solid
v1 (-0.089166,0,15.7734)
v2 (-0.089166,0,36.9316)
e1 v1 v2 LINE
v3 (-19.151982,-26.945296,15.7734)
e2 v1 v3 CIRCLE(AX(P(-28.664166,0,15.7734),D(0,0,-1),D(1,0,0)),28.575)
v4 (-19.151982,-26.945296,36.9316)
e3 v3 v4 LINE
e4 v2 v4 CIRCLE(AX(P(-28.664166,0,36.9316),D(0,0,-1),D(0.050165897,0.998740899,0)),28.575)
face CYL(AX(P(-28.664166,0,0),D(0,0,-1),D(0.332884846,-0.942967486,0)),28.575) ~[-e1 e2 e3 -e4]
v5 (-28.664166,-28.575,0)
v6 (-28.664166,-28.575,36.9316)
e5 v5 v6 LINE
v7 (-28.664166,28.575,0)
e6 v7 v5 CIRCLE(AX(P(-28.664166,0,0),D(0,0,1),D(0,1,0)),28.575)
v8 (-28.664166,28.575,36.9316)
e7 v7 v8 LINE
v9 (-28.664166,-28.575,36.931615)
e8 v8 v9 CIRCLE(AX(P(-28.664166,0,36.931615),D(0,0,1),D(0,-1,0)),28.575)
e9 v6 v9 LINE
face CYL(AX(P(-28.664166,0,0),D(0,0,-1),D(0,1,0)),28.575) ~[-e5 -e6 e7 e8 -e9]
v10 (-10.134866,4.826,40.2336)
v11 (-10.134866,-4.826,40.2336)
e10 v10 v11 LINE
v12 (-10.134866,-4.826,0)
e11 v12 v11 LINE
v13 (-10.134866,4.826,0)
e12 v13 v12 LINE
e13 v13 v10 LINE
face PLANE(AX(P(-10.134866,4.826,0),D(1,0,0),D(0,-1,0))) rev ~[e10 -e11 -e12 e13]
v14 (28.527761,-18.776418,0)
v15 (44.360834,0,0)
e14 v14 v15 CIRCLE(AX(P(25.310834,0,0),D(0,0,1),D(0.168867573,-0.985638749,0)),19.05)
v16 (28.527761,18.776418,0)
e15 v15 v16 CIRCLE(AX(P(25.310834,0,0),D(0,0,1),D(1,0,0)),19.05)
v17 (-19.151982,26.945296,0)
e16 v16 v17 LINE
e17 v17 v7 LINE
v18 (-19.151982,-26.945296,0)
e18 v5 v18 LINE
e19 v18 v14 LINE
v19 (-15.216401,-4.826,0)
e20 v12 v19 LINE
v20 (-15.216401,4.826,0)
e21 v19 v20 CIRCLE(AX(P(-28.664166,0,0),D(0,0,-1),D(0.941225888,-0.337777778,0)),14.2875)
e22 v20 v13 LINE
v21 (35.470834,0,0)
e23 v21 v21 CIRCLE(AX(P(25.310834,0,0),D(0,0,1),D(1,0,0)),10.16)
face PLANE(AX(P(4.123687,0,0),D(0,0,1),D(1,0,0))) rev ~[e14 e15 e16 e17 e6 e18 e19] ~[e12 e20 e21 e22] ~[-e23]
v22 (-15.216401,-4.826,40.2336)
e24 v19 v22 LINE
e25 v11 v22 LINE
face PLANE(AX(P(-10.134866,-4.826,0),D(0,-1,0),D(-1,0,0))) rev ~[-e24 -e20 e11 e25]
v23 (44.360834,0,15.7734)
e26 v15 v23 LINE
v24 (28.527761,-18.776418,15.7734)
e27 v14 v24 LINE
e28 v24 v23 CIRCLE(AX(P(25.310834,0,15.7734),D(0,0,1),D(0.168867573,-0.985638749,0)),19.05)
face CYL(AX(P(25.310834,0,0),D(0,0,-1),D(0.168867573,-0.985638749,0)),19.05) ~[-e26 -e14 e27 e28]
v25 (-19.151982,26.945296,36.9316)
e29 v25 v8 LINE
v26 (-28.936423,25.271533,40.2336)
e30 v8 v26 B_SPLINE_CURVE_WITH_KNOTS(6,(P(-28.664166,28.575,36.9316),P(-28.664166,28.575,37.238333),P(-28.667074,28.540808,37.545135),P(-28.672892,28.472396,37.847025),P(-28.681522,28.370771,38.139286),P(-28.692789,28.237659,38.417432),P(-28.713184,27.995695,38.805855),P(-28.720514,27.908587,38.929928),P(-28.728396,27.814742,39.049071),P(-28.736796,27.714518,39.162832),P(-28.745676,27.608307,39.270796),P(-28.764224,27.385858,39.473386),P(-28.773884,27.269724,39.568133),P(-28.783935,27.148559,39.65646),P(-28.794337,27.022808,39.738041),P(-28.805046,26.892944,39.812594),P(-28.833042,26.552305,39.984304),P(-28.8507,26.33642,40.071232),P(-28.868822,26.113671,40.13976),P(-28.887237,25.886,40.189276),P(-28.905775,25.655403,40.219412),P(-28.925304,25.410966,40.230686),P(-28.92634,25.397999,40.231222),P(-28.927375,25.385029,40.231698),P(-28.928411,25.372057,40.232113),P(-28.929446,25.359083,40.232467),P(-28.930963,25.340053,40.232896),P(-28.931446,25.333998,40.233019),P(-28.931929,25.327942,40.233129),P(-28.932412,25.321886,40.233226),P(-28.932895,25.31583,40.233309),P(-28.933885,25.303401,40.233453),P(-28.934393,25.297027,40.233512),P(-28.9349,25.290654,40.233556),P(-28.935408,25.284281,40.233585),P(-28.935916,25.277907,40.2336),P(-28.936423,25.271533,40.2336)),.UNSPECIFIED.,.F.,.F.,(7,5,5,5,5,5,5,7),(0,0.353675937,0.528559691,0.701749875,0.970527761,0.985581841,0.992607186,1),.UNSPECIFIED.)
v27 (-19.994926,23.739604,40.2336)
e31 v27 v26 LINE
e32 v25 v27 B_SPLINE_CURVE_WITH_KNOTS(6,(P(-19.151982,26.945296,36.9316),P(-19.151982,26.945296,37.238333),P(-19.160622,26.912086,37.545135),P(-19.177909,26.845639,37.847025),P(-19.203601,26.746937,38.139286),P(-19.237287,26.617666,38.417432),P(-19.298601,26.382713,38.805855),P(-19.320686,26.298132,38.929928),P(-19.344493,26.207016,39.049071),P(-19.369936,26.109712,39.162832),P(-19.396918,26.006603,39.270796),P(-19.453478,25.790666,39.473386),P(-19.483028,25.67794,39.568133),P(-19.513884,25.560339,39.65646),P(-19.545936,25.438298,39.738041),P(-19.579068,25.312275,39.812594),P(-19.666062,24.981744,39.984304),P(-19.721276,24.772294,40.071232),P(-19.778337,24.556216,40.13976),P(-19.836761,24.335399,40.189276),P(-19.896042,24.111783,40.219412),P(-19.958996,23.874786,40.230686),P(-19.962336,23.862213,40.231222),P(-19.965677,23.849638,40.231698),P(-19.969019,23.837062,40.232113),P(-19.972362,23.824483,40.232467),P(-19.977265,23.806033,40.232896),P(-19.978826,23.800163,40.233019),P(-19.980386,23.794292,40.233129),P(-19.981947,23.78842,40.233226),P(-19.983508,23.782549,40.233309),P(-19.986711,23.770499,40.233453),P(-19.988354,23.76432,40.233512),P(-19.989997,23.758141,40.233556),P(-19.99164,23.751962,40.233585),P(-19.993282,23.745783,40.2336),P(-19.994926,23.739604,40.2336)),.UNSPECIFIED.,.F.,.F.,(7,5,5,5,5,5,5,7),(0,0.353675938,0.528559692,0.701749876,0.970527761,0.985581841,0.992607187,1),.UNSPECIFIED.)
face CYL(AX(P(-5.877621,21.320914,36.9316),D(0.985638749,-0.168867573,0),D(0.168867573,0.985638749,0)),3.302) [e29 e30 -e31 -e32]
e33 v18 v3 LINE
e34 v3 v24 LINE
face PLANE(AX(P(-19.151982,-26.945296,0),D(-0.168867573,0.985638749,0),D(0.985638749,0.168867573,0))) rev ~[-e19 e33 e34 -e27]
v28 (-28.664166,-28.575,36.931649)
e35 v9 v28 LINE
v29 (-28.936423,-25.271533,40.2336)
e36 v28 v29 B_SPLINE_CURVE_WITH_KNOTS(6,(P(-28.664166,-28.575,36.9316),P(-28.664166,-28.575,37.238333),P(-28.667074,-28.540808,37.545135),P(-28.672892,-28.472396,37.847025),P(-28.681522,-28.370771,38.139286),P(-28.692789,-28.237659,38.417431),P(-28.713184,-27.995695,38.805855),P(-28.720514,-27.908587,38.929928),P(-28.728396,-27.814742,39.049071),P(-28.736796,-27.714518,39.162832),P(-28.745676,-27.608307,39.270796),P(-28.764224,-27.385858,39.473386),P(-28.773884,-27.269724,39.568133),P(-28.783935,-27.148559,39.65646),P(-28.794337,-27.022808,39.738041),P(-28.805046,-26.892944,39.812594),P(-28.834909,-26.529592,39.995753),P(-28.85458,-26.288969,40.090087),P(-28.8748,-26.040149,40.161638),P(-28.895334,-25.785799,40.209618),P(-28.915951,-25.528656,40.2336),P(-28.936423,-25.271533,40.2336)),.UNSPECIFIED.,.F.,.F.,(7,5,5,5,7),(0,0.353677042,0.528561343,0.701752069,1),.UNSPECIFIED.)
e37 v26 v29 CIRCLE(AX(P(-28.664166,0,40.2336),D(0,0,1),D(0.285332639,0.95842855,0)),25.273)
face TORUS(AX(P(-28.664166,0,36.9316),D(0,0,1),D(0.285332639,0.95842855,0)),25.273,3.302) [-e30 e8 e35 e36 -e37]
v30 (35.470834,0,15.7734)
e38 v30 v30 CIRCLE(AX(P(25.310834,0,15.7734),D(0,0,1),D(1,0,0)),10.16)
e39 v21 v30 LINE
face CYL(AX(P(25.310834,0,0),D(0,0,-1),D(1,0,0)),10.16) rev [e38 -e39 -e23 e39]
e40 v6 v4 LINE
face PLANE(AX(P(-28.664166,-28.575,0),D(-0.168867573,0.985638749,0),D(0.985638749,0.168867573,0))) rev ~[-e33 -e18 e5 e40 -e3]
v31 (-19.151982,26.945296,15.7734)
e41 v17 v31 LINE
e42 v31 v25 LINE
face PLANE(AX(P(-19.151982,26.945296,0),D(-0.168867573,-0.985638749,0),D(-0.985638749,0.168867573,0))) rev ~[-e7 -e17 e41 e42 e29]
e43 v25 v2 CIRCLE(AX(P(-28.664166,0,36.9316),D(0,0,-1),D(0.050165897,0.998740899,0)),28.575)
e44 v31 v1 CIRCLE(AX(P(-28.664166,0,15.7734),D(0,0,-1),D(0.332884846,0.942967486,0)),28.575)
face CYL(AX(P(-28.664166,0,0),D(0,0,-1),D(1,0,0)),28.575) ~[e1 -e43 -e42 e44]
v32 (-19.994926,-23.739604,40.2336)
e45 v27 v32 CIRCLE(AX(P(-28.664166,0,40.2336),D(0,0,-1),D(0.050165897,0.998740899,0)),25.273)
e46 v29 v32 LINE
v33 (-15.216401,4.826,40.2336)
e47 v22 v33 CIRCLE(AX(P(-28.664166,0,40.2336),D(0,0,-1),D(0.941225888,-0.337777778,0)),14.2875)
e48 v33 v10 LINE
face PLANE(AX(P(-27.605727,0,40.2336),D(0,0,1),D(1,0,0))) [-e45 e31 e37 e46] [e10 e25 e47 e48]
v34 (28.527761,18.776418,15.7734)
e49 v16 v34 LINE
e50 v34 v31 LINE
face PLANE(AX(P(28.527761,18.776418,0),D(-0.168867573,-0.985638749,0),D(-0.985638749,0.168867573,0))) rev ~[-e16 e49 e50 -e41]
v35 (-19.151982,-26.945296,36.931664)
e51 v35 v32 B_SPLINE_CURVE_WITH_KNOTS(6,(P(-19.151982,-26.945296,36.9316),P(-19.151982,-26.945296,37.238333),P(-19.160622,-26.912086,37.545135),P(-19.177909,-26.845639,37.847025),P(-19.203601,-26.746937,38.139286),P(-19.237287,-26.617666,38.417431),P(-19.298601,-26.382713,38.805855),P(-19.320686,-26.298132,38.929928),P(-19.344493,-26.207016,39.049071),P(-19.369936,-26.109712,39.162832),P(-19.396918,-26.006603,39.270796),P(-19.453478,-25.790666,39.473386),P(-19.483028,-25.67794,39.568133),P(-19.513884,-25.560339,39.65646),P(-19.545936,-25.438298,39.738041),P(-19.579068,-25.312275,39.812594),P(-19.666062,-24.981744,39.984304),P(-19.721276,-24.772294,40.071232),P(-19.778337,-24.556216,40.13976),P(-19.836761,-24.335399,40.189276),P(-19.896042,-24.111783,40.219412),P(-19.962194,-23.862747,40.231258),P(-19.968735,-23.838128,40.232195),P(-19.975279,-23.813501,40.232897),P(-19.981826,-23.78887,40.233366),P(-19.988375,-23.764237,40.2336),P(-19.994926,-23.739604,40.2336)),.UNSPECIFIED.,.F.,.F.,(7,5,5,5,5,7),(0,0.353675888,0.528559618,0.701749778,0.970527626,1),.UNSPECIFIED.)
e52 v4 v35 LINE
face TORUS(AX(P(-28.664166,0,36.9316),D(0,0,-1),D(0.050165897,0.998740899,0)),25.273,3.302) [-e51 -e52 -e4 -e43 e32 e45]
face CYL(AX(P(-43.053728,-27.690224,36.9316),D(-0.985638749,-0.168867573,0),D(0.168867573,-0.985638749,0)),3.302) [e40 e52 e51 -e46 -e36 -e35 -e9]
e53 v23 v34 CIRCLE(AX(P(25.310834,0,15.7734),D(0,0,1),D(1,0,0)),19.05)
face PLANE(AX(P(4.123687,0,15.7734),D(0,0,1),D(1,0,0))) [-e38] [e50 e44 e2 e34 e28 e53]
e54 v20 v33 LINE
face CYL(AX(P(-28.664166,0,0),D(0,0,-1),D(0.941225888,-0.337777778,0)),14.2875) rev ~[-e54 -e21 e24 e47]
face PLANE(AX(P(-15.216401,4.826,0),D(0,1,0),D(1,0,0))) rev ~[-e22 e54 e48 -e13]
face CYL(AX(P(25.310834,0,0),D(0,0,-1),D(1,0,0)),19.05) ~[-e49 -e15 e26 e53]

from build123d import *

# Parameters (mm, degrees)
F1_DEPTH    = 40.2336
F0_R        = 10.16
F2_DEPTH    = 15.7734
F3_T1_DEPTH = 37.7177817865
F3_T3_DEPTH = 37.7177817865
F3_T6_ANGLE = 213.1574660215
F3_T8_ANGLE = 174.2489977384


# Not quite as in the source:
# - a fillet or chamfer that OpenCascade refuses, or shapes differently, is made with other operations: its cross-section is extruded or revolved along the edge and cut away or added


with BuildPart() as f1:
    # F0 (on Top) → F1 (new body)
    with BuildSketch(Plane.XY):
        with BuildLine():
            Line((-19.1519816242, 26.9452959039), (-28.6641661078, 28.575))
            ThreePointArc((-28.6641661078, 28.575), (-57.2391661078, 0), (-28.6641661078, -28.575))
            Line((-28.6641661078, -28.575), (-19.1519816242, -26.9452959039))
            ThreePointArc((-19.1519816242, -26.9452959039), (-5.3367005723, -16.5033322905), (-0.0891661078, 0))
            ThreePointArc((-0.0891661078, 0), (-5.3367005723, 16.5033322905), (-19.1519816242, 26.9452959039))
        make_face()
        with BuildLine():
            ThreePointArc((-15.2164012284, -4.826), (-42.9516661078, 0), (-15.2164012284, 4.826))
            Line((-15.2164012284, 4.826), (-10.1348661078, 4.826))
            Line((-10.1348661078, 4.826), (-10.1348661078, -4.826))
            Line((-10.1348661078, -4.826), (-15.2164012284, -4.826))
        make_face(mode=Mode.SUBTRACT)
    extrude(amount=F1_DEPTH)

    # F0 (on Top) → F2 (join)
    with BuildSketch(Plane.XY):
        with BuildLine():
            Line((28.5277611544, 18.7764181619), (-19.1519816242, 26.9452959039))
            ThreePointArc((-19.1519816242, 26.9452959039), (-5.3367005723, 16.5033322905), (-0.0891661078, 0))
            ThreePointArc((-0.0891661078, 0), (-5.3367005723, -16.5033322905), (-19.1519816242, -26.9452959039))
            Line((-19.1519816242, -26.9452959039), (28.5277611544, -18.7764181619))
            ThreePointArc((28.5277611544, -18.7764181619), (6.2608338922, 0), (28.5277611544, 18.7764181619))
        make_face()
        with BuildLine():
            ThreePointArc((44.3608338922, 0), (39.8742291753, 12.2804730295), (28.5277611544, 18.7764181619))
            ThreePointArc((28.5277611544, 18.7764181619), (6.2608338922, 0), (28.5277611544, -18.7764181619))
            ThreePointArc((28.5277611544, -18.7764181619), (39.8742291753, -12.2804730295), (44.3608338922, 0))
        make_face()
        with Locations((25.3108338922, 0)):
            Circle(F0_R, mode=Mode.SUBTRACT)
    extrude(amount=F2_DEPTH)

    # F3: fillet of radius 3.302 on 4 edges, made by hand

    # F3_s2 → F3_t1 (cut)
    with BuildSketch(Plane(origin=(-46.4348249971, -7.955588396, 0), x_dir=(0, 0, 1), z_dir=(0.9856387487, 0.1688675728, 0))):
        with BuildLine():
            ThreePointArc((36.9316, 23.3241790854), (39.2664665915, 22.3570456768), (40.2336, 20.0221790854))
            Line((40.2336, 20.0221790854), (40.2336, 23.3241790854))
            Line((40.2336, 23.3241790854), (36.9316, 23.3241790854))
        make_face()
    extrude(amount=F3_T1_DEPTH, mode=Mode.SUBTRACT)

    # F3_s4 → F3_t3 (cut)
    with BuildSketch(Plane(origin=(-9.258717755, 1.5862781337, 0), x_dir=(0, 0, 1), z_dir=(-0.9856387487, 0.1688675728, 0))):
        with BuildLine():
            ThreePointArc((36.9316, 23.3241790854), (39.2664665915, 22.3570456768), (40.2336, 20.0221790854))
            Line((40.2336, 20.0221790854), (40.2336, 23.3241790854))
            Line((40.2336, 23.3241790854), (36.9316, 23.3241790854))
        make_face()
    extrude(amount=F3_T3_DEPTH, mode=Mode.SUBTRACT)

    # F3_s5 → F3_t6 (revolve, cut)
    with BuildSketch(Plane(origin=(-26.3304812045, 7.8388166507, 0), x_dir=(0, 0, 1), z_dir=(0.95842855, -0.2853326385, 0))):
        with BuildLine():
            ThreePointArc((36.9316, -20.3961778531), (39.2664665915, -19.4290444446), (40.2336, -17.0941778531))
            Line((40.2336, -17.0941778531), (40.2336, -20.3961778531))
            Line((40.2336, -20.3961778531), (36.9316, -20.3961778531))
        make_face()
    revolve(axis=Axis((-28.6641661078, 0, 40.2336), (0, 0, 1)), revolution_arc=F3_T6_ANGLE, mode=Mode.SUBTRACT)

    # F3_s7 → F3_t8 (revolve, cut)
    with BuildSketch(Plane(origin=(-28.5920293734, 1.4361530661, 0), x_dir=(0, 0, 1), z_dir=(-0.9987408987, 0.0501658971, 0))):
        with BuildLine():
            ThreePointArc((40.2336, 23.835036392), (39.2664665915, 26.1699029835), (36.9316, 27.137036392))
            Line((36.9316, 27.137036392), (40.2336, 27.137036392))
            Line((40.2336, 27.137036392), (40.2336, 23.835036392))
        make_face()
    revolve(axis=Axis((-28.6641661078, 0, 40.2336), (0, 0, -1)), revolution_arc=F3_T8_ANGLE, mode=Mode.SUBTRACT)


solid = f1.part
